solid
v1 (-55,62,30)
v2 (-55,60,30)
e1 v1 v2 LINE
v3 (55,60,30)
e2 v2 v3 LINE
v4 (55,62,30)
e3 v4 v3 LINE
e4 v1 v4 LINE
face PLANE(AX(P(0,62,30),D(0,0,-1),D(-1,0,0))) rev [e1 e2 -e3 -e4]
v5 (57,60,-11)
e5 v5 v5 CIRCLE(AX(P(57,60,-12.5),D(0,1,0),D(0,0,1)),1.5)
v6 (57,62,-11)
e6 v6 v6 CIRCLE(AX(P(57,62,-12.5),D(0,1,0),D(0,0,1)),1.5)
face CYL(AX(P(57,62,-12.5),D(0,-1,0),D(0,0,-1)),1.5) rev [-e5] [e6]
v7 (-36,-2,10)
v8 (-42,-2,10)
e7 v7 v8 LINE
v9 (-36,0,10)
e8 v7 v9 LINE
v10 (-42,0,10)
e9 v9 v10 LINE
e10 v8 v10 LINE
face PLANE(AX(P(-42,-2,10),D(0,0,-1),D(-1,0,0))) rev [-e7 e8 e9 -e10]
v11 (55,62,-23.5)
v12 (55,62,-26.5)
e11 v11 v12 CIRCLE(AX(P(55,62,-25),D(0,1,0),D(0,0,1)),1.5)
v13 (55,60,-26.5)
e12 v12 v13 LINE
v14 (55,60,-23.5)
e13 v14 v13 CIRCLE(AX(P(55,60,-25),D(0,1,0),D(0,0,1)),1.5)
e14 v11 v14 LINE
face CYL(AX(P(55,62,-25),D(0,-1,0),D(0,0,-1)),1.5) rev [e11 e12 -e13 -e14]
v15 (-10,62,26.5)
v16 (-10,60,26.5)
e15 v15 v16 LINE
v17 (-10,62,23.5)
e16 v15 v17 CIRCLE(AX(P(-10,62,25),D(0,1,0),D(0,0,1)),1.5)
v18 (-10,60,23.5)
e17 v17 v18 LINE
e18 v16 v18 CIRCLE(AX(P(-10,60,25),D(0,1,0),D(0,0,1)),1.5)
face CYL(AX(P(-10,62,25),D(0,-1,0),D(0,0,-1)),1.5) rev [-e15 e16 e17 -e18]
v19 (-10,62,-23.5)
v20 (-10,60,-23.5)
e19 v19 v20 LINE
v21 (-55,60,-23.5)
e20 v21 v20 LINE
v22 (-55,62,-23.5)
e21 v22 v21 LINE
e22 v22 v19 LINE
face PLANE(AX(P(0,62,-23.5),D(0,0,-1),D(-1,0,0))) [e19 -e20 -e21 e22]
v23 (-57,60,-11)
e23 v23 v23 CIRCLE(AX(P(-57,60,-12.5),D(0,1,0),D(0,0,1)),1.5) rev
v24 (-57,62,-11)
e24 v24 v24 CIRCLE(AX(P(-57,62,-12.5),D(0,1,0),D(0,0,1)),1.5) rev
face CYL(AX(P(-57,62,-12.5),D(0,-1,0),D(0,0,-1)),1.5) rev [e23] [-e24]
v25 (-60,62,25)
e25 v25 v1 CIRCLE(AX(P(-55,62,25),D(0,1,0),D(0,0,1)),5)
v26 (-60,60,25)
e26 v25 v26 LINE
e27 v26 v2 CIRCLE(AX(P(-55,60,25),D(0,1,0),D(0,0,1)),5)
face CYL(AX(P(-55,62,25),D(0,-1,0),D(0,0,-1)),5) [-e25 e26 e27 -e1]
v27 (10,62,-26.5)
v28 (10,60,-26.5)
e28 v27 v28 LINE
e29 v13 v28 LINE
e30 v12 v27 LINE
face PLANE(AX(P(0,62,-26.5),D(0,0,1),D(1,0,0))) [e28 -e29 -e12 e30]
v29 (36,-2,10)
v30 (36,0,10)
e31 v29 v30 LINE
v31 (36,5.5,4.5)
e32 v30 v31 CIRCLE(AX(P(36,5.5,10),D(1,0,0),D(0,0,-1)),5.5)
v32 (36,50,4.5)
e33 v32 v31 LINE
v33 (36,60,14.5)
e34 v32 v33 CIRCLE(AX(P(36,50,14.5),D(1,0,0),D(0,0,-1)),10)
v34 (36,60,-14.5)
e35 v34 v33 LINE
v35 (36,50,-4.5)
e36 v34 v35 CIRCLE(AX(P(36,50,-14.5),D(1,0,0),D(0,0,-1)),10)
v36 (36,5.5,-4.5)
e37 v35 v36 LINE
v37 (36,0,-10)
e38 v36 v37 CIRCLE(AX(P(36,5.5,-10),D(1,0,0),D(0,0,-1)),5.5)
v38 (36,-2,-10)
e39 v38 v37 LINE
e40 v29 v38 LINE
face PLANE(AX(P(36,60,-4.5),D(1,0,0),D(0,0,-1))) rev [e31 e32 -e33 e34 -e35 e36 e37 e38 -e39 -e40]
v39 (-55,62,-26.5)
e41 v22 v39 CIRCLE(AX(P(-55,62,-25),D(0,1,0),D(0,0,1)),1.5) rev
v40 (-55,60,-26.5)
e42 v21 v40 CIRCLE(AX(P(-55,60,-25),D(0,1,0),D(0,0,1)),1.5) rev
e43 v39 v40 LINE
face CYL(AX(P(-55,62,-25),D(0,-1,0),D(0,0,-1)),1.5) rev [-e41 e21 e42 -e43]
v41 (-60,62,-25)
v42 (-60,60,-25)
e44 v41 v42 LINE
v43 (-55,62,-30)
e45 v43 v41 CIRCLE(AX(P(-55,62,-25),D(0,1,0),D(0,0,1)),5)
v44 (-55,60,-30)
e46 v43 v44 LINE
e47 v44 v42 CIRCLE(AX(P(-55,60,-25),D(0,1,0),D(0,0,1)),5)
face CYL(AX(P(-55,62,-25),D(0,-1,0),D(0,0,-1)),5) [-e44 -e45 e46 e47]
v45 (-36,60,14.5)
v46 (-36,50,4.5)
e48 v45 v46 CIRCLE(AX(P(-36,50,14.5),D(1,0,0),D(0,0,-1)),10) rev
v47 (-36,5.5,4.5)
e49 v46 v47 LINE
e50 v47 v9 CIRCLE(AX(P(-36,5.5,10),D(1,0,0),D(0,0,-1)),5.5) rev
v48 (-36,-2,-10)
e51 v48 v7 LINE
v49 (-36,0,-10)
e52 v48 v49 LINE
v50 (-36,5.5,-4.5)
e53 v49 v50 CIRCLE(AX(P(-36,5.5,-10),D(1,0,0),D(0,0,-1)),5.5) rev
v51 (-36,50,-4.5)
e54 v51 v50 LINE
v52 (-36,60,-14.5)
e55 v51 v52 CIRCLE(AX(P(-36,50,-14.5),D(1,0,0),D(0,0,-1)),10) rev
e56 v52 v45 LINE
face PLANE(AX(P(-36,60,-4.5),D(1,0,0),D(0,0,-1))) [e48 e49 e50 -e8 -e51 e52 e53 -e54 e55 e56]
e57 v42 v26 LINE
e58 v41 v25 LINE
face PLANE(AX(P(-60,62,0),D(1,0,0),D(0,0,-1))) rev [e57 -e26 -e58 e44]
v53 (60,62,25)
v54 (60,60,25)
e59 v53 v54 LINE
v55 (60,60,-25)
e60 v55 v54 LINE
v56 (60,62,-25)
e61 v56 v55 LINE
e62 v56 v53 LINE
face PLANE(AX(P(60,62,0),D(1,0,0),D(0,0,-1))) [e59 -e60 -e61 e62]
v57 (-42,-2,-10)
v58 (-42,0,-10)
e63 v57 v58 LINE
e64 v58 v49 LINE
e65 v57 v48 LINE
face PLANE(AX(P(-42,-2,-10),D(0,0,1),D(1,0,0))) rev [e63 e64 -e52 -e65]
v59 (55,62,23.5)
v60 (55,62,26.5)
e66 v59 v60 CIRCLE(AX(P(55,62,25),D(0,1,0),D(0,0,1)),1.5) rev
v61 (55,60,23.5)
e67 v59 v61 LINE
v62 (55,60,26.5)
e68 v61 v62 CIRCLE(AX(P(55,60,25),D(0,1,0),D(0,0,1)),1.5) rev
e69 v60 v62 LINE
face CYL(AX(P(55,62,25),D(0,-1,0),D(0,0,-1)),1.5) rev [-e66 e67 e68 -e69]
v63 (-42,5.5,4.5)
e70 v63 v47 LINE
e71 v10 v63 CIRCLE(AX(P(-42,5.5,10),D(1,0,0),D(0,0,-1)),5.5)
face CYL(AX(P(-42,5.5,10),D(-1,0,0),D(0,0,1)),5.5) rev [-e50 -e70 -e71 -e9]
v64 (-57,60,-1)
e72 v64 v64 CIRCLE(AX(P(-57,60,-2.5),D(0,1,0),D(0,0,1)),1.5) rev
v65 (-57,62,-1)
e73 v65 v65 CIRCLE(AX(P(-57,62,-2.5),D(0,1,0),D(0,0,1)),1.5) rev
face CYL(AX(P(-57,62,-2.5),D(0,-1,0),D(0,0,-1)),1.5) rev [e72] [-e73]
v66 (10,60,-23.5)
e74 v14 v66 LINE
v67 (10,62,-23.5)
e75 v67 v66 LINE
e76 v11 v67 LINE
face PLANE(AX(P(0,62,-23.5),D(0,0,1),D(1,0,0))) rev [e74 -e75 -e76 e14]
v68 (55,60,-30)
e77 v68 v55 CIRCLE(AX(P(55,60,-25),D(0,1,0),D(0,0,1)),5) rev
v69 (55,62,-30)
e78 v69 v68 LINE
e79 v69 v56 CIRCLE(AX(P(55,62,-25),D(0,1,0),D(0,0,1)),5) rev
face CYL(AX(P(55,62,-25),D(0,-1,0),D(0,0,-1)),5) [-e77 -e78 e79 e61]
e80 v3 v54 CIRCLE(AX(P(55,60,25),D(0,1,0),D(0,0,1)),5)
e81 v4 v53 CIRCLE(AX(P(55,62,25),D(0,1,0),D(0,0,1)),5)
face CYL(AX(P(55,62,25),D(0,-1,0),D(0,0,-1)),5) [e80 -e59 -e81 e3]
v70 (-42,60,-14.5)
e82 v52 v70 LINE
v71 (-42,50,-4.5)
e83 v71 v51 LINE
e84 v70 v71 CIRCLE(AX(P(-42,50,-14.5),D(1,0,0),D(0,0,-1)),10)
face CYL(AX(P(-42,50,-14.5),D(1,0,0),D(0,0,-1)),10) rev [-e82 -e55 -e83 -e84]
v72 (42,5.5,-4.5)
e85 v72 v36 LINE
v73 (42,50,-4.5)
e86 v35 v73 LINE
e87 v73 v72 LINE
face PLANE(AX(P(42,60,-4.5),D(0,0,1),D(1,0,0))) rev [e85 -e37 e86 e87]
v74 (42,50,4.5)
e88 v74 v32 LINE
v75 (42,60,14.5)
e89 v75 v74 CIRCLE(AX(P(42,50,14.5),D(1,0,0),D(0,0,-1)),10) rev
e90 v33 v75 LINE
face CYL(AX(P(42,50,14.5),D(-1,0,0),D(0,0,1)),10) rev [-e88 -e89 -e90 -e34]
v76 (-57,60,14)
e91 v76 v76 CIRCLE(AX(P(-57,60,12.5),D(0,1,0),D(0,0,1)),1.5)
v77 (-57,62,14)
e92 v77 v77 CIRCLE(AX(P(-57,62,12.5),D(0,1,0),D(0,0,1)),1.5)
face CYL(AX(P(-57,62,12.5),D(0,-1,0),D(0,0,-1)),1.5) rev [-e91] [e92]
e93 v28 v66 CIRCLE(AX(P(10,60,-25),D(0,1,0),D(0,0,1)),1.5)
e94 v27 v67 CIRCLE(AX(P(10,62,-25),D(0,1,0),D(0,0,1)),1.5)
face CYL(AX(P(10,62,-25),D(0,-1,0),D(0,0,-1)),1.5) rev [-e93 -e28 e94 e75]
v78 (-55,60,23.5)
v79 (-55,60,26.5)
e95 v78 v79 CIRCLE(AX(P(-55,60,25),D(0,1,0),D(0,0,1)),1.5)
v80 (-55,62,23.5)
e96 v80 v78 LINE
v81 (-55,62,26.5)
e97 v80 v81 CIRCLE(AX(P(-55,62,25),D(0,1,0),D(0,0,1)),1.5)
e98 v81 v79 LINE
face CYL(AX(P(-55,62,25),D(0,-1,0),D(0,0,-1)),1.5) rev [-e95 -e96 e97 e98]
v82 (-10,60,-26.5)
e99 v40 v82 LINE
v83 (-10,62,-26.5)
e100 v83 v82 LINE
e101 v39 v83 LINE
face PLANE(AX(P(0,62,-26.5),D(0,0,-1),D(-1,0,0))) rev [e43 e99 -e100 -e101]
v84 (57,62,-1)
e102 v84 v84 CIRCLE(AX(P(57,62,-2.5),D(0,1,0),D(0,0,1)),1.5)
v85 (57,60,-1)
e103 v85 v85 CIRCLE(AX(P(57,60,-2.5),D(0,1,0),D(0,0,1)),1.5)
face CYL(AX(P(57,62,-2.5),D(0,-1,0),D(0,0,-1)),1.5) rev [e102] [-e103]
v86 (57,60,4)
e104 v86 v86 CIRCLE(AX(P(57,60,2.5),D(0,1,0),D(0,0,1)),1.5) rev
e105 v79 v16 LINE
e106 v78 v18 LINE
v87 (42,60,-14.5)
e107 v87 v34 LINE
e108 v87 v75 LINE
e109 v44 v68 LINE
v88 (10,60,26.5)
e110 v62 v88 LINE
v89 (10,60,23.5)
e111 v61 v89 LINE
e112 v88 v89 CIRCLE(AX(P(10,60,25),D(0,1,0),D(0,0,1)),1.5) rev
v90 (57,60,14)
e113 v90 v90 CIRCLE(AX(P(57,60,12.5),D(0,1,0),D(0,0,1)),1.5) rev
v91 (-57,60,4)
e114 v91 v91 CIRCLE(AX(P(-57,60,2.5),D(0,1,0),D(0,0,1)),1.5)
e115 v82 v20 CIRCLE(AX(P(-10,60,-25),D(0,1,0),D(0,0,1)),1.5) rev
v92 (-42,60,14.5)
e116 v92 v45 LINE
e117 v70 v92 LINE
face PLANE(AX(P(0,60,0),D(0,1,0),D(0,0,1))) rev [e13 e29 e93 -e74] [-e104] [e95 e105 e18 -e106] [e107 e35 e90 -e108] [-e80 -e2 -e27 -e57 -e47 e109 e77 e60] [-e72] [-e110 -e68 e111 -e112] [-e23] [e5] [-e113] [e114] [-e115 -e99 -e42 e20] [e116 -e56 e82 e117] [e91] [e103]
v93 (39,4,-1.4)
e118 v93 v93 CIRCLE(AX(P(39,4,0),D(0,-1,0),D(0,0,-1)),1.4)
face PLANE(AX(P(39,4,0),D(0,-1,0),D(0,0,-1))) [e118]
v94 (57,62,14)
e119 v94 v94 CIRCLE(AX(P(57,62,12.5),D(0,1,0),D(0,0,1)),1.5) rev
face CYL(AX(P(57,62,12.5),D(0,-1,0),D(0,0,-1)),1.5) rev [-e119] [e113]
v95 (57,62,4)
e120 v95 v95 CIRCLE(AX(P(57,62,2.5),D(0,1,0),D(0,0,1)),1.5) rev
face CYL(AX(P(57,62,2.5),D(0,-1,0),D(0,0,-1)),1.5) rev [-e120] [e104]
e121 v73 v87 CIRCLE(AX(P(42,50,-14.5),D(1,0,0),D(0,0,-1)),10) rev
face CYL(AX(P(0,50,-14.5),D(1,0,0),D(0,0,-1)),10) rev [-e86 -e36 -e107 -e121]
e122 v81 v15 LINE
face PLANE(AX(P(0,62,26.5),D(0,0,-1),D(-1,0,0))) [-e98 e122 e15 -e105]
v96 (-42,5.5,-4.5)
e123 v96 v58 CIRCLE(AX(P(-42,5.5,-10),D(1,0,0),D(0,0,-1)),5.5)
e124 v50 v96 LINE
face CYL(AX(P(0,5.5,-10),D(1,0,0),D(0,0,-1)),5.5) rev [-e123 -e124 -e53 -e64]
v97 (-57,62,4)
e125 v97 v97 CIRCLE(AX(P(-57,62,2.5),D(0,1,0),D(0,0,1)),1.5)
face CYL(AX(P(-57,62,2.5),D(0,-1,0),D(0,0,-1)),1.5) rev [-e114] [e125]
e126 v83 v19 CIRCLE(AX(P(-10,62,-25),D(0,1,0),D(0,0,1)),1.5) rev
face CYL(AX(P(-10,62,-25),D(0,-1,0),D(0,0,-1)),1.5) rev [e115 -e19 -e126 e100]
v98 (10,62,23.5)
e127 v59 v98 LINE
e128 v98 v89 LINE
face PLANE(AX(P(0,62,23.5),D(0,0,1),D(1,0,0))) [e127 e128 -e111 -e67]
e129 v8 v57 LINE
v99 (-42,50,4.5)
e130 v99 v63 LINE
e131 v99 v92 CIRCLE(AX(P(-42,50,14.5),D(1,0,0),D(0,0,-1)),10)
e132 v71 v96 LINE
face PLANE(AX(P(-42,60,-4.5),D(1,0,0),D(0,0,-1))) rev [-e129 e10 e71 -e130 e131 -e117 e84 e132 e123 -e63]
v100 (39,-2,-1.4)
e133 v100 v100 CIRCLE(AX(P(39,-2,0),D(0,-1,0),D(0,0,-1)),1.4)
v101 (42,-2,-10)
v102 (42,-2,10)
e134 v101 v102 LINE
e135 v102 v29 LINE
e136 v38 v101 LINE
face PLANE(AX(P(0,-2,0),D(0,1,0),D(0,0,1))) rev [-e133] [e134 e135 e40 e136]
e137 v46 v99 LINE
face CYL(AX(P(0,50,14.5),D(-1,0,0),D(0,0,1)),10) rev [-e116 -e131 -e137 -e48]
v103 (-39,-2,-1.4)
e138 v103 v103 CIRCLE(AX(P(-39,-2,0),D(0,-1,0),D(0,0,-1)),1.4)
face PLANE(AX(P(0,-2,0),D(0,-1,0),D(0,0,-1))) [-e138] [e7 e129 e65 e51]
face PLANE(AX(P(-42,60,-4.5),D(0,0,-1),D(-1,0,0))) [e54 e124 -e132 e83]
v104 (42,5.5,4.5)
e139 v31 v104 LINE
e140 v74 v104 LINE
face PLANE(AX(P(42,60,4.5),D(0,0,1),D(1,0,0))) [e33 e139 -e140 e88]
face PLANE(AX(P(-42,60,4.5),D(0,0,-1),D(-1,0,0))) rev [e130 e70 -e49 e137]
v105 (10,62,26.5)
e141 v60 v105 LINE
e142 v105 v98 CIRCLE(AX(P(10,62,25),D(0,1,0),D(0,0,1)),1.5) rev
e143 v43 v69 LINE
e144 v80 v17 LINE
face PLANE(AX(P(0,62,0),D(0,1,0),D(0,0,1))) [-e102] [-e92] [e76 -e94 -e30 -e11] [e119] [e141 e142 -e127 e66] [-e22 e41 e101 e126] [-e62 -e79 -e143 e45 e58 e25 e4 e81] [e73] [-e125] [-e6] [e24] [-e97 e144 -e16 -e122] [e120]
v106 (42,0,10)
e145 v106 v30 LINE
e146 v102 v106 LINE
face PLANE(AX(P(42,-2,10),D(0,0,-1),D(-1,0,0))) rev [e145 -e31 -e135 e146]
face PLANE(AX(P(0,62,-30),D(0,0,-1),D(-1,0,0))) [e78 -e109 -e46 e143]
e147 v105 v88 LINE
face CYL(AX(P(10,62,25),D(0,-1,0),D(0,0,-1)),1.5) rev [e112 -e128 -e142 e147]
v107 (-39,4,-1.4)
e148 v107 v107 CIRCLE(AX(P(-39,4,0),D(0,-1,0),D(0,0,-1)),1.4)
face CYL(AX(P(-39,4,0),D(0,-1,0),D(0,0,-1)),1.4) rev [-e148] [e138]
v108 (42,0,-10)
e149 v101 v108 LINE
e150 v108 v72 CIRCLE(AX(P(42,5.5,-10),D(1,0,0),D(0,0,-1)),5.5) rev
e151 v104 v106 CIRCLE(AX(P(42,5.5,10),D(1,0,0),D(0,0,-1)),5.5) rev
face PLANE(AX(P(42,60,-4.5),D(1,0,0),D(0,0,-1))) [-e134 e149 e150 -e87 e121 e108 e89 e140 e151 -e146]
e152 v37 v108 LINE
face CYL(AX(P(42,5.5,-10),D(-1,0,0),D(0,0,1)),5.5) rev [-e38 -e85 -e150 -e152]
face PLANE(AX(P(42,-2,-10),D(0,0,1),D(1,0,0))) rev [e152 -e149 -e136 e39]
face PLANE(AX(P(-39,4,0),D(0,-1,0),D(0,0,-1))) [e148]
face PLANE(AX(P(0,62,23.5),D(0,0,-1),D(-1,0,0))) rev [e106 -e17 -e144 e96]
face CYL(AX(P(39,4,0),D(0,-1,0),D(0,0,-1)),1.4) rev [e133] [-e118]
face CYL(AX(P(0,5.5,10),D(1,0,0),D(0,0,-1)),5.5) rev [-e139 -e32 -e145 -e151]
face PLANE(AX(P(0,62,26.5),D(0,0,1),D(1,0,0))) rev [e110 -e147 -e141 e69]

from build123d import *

# Parameters (mm, degrees)
SKETCH1_W             = 6
SKETCH1_H             = 9
BOSS_EXTRUDE1_DEPTH   = 60
BOSS_EXTRUDE1_2_DEPTH = 60
SKETCH2_W             = 6
SKETCH2_H             = 20
BOSS_EXTRUDE2_DEPTH   = 2
SKETCH3_R             = 1.4
CUT_EXTRUDE1_DEPTH    = 6
FILLET1_R             = 5.5
FILLET2_R             = 5.5
SKETCH4_R             = 1.5
BOSS_EXTRUDE4_DEPTH   = 2
FILLET4_R             = 10


with BuildPart() as part:
    # Sketch1 → Boss-Extrude1 (new body)
    with BuildSketch(Plane(origin=(0, 0, 0), x_dir=(1, 0, 0), z_dir=(0, 1, 0))):
        with Locations((39, 0)):
            Rectangle(SKETCH1_W, SKETCH1_H)
    extrude(amount=BOSS_EXTRUDE1_DEPTH)



with BuildPart() as body_2:
    # Sketch1 → Boss-Extrude1 2 (new body)
    with BuildSketch(Plane(origin=(0, 0, 0), x_dir=(1, 0, 0), z_dir=(0, 1, 0))):
        with Locations((-39, 0)):
            Rectangle(SKETCH1_W, SKETCH1_H)
    extrude(amount=BOSS_EXTRUDE1_2_DEPTH)


with BuildPart() as part_1:
    add(part.part)

    add(body_2.part)  # Boss-Extrude2 merges body 2
    # Sketch2 → Boss-Extrude2 (add)
    with BuildSketch(Plane.XZ):
        with Locations((-39, 0)):
            Rectangle(SKETCH2_W, SKETCH2_H)
        with Locations((39, 0)):
            Rectangle(SKETCH2_W, SKETCH2_H)
    extrude(amount=BOSS_EXTRUDE2_DEPTH)

    # Sketch3 → Cut-Extrude1 (cut)
    with BuildSketch(Plane.XZ.offset(2)):
        with Locations(Location((39, 0, 0), (0, 0, 270))):
            Circle(SKETCH3_R)
        with Locations(Location((-39, 0, 0), (0, 0, 270))):
            Circle(SKETCH3_R)
    extrude(amount=-CUT_EXTRUDE1_DEPTH, mode=Mode.SUBTRACT)

    # Fillet1
    fillet1_edges = [part_1.edges().sort_by_distance(p)[0] for p in [
        (-39, 0, -4.5),
        (-39, 0, 4.5),
    ]]
    fillet(fillet1_edges, radius=FILLET1_R - 0.0001)  # a hair under: the kernel refuses the full size

    # Fillet2
    fillet2_edges = [part_1.edges().sort_by_distance(p)[0] for p in [
        (39, 0, -4.5),
        (39, 0, 4.5),
    ]]
    fillet(fillet2_edges, radius=FILLET2_R - 0.0001)  # a hair under: the kernel refuses the full size

    # Sketch4 → Boss-Extrude4 (add)
    with BuildSketch(Plane(origin=(0, 60, 0), x_dir=(1, 0, 0), z_dir=(0, 1, 0))):
        with BuildLine():
            Line((-55, 30), (55, 30))
            ThreePointArc((55, 30), (58.535533906, 28.535533906), (60, 25))
            Line((60, 25), (60, -25))
            ThreePointArc((60, -25), (58.535533906, -28.535533906), (55, -30))
            Line((55, -30), (-55, -30))
            ThreePointArc((-55, -30), (-58.535533906, -28.535533906), (-60, -25))
            Line((-60, -25), (-60, 25))
            ThreePointArc((-60, 25), (-58.535533906, 28.535533906), (-55, 30))
        make_face()
        with Locations(Location((-57, -2.5, 0), (0, 0, 270))):
            Circle(SKETCH4_R, mode=Mode.SUBTRACT)
        with Locations(Location((-57, -12.5, 0), (0, 0, 270))):
            Circle(SKETCH4_R, mode=Mode.SUBTRACT)
        with Locations(Location((57, -12.5, 0), (0, 0, 270))):
            Circle(SKETCH4_R, mode=Mode.SUBTRACT)
        with Locations(Location((57, -2.5, 0), (0, 0, 270))):
            Circle(SKETCH4_R, mode=Mode.SUBTRACT)
        with Locations(Location((57, 2.5, 0), (0, 0, 270))):
            Circle(SKETCH4_R, mode=Mode.SUBTRACT)
        with Locations(Location((57, 12.5, 0), (0, 0, 270))):
            Circle(SKETCH4_R, mode=Mode.SUBTRACT)
        with Locations(Location((-57, 12.5, 0), (0, 0, 270))):
            Circle(SKETCH4_R, mode=Mode.SUBTRACT)
        with Locations(Location((-57, 2.5, 0), (0, 0, 270))):
            Circle(SKETCH4_R, mode=Mode.SUBTRACT)
        with BuildLine():
            Line((55, 23.5), (10, 23.5))
            ThreePointArc((10, 23.5), (8.5, 25), (10, 26.5))
            Line((10, 26.5), (55, 26.5))
            ThreePointArc((55, 26.5), (56.5, 25), (55, 23.5))
        make_face(mode=Mode.SUBTRACT)
        with BuildLine():
            Line((-55, -23.5), (-10, -23.5))
            ThreePointArc((-10, -23.5), (-8.5, -25), (-10, -26.5))
            Line((-10, -26.5), (-55, -26.5))
            ThreePointArc((-55, -26.5), (-56.5, -25), (-55, -23.5))
        make_face(mode=Mode.SUBTRACT)
        with BuildLine():
            Line((-55, 23.5), (-10, 23.5))
            ThreePointArc((-10, 23.5), (-8.5, 25), (-10, 26.5))
            Line((-10, 26.5), (-55, 26.5))
            ThreePointArc((-55, 26.5), (-56.5, 25), (-55, 23.5))
        make_face(mode=Mode.SUBTRACT)
        with BuildLine():
            Line((55, -23.5), (10, -23.5))
            ThreePointArc((10, -23.5), (8.5, -25), (10, -26.5))
            Line((10, -26.5), (55, -26.5))
            ThreePointArc((55, -26.5), (56.5, -25), (55, -23.5))
        make_face(mode=Mode.SUBTRACT)
    extrude(amount=BOSS_EXTRUDE4_DEPTH)

    # Fillet4
    fillet4_edges = [part_1.edges().sort_by_distance(p)[0] for p in [
        (39, 60, 4.5),
        (39, 60, -4.5),
        (-39, 60, -4.5),
        (-39, 60, 4.5),
    ]]
    fillet(fillet4_edges, radius=FILLET4_R)


solid = part_1.part
